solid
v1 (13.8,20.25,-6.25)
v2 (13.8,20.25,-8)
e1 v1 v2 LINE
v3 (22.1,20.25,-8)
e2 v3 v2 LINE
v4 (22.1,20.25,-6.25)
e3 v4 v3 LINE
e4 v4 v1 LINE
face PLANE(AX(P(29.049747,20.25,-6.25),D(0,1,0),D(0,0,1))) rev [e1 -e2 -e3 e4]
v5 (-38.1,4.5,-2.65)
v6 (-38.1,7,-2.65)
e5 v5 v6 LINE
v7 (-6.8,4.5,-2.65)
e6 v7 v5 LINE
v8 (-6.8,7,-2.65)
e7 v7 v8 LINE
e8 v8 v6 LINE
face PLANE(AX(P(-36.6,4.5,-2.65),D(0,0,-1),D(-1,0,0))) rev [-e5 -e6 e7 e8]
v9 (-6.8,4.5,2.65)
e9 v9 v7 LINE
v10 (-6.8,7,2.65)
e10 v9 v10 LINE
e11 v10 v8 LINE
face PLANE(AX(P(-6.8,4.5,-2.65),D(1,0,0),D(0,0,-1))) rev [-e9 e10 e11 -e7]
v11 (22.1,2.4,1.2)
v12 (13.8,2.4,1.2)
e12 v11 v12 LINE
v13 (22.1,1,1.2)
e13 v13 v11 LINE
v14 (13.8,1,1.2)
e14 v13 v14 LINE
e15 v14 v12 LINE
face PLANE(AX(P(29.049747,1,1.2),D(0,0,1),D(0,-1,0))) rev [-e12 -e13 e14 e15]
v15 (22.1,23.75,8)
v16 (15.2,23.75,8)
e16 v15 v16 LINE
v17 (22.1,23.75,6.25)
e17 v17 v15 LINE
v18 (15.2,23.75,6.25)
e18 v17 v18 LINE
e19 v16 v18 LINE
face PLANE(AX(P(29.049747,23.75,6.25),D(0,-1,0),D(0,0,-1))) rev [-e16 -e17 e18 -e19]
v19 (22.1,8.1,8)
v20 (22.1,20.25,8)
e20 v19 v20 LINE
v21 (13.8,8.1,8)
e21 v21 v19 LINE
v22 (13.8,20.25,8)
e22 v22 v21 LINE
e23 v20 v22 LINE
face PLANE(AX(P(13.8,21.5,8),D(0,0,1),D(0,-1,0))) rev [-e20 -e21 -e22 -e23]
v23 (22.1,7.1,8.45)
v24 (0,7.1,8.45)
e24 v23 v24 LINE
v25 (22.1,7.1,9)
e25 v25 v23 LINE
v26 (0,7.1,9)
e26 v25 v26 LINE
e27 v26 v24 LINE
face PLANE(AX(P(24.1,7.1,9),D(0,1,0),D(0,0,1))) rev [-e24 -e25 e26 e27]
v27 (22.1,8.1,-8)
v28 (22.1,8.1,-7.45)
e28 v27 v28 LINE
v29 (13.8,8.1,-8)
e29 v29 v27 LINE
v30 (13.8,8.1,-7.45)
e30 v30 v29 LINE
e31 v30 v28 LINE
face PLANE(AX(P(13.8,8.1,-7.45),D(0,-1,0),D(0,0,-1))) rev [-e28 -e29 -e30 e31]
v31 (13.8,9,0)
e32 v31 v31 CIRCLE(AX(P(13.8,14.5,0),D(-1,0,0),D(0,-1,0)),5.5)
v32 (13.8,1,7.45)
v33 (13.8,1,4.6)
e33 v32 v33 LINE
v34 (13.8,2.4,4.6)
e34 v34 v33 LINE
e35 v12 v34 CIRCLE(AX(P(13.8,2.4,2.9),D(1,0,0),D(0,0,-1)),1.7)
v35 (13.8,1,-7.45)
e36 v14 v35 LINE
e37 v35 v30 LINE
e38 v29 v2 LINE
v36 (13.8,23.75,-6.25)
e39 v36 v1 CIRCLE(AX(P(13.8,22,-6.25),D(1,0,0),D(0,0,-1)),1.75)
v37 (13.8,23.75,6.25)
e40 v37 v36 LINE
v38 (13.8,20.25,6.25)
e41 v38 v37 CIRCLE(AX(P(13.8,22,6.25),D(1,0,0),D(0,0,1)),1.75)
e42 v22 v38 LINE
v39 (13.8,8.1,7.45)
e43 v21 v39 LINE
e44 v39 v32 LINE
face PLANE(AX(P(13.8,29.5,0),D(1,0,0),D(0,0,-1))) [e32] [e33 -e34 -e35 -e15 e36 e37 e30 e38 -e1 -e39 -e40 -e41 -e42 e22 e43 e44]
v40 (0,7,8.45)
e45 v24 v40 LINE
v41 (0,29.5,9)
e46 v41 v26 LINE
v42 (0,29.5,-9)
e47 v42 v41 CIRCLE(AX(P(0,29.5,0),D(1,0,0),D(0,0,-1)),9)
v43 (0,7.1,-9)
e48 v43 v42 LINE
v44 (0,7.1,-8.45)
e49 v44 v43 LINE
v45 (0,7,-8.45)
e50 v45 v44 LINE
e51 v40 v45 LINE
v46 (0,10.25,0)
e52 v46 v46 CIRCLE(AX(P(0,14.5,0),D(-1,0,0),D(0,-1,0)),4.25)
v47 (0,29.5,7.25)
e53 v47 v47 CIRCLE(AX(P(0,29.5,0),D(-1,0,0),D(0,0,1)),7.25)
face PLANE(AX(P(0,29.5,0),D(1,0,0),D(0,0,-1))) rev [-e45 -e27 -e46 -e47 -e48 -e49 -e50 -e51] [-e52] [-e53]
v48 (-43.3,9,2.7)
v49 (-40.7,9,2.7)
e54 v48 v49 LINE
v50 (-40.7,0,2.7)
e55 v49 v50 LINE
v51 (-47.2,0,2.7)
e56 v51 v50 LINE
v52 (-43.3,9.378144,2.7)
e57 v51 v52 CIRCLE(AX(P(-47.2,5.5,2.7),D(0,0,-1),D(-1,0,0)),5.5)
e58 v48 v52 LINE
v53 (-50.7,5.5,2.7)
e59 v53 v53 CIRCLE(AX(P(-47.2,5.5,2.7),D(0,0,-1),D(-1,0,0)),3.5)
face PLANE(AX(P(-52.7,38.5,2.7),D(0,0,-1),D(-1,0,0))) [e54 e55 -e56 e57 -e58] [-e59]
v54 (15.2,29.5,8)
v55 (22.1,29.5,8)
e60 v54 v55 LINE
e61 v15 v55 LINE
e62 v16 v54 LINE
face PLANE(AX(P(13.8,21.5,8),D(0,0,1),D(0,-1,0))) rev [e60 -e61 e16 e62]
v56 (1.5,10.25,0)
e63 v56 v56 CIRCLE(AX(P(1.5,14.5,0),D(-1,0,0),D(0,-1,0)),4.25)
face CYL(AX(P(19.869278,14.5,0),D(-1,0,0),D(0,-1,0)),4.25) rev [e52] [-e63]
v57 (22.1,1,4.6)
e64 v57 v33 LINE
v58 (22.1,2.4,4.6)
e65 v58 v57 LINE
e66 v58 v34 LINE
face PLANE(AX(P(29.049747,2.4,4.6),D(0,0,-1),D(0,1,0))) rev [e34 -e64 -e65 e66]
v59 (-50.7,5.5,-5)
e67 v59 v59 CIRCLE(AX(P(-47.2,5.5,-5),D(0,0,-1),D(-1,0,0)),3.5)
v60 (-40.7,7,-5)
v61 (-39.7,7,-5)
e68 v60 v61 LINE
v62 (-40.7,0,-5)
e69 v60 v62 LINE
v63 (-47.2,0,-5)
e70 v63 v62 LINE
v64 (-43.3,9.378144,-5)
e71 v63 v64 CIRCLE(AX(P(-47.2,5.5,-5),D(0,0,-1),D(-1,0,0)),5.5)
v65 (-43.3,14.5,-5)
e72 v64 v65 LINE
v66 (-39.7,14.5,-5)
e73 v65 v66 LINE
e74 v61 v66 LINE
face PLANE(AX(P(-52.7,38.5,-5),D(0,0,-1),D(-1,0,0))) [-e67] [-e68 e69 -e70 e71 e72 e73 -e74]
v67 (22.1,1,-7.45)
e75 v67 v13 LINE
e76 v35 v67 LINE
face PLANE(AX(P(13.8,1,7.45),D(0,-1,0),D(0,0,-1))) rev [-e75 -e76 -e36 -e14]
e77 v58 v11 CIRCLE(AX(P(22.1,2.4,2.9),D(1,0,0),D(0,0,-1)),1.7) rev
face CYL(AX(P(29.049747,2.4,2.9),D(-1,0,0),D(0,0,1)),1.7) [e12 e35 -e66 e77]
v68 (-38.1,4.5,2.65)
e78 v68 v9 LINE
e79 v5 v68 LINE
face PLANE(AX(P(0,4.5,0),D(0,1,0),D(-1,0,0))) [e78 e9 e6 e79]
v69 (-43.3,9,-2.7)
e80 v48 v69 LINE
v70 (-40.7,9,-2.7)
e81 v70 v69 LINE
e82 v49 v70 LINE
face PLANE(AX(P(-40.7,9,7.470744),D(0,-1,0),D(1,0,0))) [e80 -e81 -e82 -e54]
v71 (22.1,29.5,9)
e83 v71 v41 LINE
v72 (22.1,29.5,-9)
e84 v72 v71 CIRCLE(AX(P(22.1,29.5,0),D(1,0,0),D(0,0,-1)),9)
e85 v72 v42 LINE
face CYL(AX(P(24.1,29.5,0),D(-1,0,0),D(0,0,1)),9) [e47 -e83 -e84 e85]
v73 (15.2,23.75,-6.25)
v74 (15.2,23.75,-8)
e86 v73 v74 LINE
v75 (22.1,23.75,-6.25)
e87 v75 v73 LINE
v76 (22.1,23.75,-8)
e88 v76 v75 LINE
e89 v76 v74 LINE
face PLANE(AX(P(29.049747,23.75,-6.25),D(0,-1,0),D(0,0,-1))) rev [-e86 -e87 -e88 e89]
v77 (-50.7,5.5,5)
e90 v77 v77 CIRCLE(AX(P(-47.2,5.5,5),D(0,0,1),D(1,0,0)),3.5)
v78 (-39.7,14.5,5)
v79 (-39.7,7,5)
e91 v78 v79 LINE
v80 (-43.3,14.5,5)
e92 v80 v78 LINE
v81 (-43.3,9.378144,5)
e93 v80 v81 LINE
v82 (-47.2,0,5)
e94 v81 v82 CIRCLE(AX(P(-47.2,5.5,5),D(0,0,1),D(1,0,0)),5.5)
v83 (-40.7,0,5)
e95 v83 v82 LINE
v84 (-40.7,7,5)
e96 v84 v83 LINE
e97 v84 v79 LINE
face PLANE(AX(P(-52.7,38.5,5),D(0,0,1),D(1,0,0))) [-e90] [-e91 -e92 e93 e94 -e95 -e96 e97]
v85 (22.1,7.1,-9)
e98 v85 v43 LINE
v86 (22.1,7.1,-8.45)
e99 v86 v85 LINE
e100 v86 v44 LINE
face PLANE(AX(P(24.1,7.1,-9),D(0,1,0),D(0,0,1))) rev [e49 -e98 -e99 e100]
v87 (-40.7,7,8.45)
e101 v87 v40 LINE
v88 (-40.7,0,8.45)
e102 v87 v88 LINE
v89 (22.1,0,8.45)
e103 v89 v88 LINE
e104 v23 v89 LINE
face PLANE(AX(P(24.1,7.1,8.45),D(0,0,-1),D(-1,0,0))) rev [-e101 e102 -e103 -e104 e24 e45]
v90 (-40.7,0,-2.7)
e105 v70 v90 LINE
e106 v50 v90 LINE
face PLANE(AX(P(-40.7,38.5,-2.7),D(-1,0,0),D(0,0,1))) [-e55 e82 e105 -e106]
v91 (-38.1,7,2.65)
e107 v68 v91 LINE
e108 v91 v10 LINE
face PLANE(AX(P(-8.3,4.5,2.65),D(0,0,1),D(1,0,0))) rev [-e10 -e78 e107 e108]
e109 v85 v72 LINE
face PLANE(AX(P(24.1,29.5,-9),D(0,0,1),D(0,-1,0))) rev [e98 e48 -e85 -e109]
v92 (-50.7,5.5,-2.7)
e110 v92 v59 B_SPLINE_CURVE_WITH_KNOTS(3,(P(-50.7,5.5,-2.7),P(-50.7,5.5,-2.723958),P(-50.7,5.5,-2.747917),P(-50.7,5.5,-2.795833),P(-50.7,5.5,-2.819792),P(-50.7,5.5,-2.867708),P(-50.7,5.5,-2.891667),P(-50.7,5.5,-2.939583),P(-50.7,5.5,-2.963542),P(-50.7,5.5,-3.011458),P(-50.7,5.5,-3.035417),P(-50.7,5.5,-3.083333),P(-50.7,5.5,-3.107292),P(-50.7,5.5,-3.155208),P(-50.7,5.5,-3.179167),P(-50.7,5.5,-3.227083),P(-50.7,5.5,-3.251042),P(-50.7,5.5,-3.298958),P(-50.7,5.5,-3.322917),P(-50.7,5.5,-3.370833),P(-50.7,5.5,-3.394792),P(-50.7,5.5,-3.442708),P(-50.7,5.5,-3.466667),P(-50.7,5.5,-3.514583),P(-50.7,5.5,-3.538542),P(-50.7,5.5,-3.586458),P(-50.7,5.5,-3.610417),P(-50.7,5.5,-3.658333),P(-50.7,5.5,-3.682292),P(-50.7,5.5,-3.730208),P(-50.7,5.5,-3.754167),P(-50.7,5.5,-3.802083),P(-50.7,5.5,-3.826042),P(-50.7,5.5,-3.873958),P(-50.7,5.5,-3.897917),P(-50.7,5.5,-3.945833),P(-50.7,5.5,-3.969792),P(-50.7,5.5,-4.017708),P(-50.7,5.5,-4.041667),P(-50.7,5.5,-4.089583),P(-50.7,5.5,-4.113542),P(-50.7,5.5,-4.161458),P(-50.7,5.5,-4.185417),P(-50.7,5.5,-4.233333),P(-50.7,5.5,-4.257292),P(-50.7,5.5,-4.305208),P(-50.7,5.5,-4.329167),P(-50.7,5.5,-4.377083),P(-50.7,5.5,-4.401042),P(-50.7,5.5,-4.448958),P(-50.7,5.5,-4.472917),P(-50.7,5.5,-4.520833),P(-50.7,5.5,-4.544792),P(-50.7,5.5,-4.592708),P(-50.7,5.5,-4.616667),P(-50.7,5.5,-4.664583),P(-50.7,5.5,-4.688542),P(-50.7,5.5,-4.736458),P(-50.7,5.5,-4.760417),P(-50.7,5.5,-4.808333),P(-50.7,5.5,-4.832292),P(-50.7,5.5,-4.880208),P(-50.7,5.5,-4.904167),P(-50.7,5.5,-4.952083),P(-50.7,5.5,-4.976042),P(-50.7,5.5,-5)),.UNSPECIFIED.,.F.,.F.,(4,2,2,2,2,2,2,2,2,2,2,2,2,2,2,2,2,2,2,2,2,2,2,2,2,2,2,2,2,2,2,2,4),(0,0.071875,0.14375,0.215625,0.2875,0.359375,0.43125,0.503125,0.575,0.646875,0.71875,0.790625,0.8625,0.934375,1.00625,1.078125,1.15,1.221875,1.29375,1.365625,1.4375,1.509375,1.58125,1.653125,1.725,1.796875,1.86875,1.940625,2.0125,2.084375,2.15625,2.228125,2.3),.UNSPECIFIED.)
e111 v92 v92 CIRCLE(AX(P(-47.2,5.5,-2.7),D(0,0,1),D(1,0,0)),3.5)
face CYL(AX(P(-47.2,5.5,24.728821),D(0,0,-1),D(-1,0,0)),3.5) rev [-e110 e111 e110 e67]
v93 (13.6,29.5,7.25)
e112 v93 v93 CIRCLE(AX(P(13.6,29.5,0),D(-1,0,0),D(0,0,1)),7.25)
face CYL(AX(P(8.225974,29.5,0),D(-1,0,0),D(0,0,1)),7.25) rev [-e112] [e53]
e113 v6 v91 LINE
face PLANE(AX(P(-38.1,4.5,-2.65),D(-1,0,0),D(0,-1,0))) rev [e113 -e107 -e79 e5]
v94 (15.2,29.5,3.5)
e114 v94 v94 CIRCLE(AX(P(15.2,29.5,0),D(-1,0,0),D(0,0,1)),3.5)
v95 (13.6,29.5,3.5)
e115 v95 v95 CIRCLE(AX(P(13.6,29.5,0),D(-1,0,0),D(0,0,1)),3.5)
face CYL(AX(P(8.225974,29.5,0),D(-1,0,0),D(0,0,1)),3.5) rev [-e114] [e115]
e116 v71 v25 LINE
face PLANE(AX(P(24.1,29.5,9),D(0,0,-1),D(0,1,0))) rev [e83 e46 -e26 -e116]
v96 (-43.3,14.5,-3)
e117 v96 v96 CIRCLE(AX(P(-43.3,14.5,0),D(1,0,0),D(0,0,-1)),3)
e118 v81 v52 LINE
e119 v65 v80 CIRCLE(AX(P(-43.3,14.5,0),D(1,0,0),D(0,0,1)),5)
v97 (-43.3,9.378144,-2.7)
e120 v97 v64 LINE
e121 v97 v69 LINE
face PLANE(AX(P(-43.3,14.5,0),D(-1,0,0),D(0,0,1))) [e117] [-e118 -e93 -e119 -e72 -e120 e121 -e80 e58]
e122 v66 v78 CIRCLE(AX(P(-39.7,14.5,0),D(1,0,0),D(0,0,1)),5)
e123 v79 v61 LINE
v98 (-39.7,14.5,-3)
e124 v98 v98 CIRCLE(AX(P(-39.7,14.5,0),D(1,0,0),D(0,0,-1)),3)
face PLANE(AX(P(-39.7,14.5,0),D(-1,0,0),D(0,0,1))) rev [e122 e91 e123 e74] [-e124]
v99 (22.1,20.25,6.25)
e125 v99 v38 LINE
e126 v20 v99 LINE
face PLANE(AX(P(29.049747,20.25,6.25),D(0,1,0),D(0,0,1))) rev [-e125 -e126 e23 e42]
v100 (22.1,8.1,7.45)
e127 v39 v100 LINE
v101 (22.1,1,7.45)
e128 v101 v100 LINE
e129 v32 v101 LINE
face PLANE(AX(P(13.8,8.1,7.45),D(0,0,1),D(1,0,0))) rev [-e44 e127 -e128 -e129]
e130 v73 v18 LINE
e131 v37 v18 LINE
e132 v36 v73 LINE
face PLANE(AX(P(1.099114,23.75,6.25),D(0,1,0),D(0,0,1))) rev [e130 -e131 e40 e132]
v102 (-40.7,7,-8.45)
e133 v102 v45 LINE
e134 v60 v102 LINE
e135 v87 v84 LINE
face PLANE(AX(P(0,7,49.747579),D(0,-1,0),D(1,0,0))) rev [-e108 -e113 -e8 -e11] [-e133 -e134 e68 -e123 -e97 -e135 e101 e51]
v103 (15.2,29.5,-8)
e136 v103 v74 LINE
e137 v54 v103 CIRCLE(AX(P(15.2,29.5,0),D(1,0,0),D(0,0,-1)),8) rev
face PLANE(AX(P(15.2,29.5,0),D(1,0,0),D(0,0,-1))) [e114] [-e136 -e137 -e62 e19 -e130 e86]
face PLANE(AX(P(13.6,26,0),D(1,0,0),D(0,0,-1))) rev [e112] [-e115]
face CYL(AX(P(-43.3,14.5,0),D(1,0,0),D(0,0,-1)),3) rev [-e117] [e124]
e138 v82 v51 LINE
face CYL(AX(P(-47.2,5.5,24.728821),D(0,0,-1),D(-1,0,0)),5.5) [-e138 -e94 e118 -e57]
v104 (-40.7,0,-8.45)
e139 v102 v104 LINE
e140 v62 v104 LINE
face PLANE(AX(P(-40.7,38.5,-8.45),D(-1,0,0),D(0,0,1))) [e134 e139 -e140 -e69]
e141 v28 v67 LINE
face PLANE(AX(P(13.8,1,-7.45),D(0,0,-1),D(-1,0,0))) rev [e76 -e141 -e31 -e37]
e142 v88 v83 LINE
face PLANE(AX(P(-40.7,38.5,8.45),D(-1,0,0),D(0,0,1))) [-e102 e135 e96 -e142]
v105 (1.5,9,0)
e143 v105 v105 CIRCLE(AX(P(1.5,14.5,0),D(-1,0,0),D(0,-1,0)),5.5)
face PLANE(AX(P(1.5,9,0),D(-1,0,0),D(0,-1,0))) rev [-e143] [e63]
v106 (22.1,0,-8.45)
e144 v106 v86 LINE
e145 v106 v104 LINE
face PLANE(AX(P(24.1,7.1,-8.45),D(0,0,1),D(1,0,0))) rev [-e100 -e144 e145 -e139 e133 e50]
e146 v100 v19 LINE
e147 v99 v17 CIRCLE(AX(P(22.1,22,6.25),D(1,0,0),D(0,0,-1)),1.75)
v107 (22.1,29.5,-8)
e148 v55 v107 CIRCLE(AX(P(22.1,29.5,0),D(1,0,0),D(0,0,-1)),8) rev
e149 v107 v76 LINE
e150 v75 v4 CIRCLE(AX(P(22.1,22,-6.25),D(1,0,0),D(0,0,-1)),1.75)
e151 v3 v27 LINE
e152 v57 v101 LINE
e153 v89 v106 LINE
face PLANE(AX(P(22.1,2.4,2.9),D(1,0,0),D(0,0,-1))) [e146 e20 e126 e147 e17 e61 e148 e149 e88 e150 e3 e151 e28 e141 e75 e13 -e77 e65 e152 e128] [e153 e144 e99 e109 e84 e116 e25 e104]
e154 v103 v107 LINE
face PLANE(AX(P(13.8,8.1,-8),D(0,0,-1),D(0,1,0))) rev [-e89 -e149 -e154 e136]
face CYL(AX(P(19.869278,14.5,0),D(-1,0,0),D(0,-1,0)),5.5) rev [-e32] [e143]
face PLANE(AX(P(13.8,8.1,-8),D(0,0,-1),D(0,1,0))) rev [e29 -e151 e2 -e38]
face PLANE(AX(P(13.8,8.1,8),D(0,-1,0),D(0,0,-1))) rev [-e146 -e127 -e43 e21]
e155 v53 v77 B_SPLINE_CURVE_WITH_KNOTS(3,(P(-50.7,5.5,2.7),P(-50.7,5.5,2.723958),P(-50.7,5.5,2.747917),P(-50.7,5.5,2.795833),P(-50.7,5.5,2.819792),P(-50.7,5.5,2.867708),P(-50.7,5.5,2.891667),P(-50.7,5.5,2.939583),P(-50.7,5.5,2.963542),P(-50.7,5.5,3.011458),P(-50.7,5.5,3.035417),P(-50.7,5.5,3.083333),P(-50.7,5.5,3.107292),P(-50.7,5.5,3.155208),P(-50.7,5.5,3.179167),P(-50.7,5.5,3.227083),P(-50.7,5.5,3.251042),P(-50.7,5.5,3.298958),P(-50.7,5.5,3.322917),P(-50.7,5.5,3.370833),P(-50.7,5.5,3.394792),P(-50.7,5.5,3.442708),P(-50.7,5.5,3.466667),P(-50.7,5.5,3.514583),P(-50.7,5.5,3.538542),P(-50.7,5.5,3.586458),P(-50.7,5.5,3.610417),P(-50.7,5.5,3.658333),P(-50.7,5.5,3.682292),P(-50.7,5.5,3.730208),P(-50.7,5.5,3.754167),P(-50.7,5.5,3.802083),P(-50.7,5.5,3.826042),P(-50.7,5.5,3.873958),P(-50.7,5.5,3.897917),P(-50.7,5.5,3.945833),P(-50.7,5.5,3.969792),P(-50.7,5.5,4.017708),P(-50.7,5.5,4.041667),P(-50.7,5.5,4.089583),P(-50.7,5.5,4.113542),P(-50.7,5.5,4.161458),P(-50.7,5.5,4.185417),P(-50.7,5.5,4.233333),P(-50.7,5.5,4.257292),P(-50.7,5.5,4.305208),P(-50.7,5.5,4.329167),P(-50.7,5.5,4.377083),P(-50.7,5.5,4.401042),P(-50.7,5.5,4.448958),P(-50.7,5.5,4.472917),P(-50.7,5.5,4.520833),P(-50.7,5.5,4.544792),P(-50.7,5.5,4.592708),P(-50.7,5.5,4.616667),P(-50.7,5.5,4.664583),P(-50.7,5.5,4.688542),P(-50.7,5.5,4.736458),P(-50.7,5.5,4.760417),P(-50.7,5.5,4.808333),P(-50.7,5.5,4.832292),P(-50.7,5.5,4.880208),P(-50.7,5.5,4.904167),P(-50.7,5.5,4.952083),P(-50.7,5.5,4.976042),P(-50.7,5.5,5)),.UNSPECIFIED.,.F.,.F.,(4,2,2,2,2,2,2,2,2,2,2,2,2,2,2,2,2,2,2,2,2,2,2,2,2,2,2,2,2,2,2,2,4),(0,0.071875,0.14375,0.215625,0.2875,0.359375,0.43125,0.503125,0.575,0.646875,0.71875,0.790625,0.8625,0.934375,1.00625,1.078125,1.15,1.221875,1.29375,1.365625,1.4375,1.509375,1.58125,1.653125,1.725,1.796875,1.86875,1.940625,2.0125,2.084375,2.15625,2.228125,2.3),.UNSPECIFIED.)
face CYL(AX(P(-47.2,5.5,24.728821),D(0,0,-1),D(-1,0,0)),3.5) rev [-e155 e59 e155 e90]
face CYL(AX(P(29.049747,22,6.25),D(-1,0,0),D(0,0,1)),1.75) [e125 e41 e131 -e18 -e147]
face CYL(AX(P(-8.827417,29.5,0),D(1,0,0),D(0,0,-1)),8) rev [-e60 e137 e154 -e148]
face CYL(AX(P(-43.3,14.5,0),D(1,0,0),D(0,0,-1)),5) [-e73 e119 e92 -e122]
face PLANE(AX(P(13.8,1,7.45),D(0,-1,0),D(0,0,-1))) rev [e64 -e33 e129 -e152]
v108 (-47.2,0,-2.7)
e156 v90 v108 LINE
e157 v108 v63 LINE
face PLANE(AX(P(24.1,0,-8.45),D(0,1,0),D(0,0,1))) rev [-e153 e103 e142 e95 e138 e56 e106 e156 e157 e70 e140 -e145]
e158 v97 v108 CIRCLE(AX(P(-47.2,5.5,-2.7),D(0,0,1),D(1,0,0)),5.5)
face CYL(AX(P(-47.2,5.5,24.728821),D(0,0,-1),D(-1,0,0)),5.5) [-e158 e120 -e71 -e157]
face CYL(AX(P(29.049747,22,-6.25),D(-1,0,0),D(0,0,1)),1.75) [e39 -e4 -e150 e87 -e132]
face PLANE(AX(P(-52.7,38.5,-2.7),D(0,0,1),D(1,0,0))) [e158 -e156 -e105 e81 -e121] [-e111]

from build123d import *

# Parameters (mm, degrees)
BOSS_EXTRUDE18_DEPTH            = 24.1
CUT_EXTRUDE24_DEPTH             = 10.3
CUT_EXTRUDE25_DEPTH             = 8.9
BOSS_EXTRUDE7_DEPTH             = 9.3
CUT_EXTRUDE21_START             = -2
CUT_EXTRUDE21_DEPTH             = 2
BOSS_EXTRUDE2_REACH             = 48.304
SKETCH16_W                      = 40.7
SKETCH16_H                      = 7
BOSS_EXTRUDE2_DIRECTION_2_REACH = 48.304
BOSS_EXTRUDE3_REACH             = 58.743
SKETCH23_R                      = 3.5
BOSS_EXTRUDE3_DIRECTION_2_REACH = 58.743
SKETCH24_W                      = 12
SKETCH24_H                      = 5.4
SKETCH24_H_2                    = 3.45
CUT_EXTRUDE6_DEPTH              = 66.882774684
BOSS_EXTRUDE4_DEPTH             = 1
BOSS_EXTRUDE4_DEPTH_BACK        = 2.6
SKETCH28_R                      = 3
SKETCH33_W                      = 2.6
SKETCH33_H                      = 4
CUT_EXTRUDE10_DEPTH             = 5.4
CUT_EXTRUDE12_DEPTH             = 2.5
DELETEFACE7_START               = 23.1
DELETEFACE7_DEPTH               = 1
CUT_EXTRUDE29_START             = -1
SKETCH105_R                     = 1.7
CUT_EXTRUDE29_DEPTH             = 1
SKETCH106_W                     = 18
SKETCH106_H                     = 31.4
CUT_EXTRUDE30_DEPTH             = 2
CUT_EXTRUDE31_DEPTH             = 1.4


# Read off the part's stored shape, not the designer's step: DeleteFace7
with BuildPart() as part:
    # Sketch95 → Boss-Extrude18 (new body)
    with BuildSketch(Plane(origin=(0, 0, 0), x_dir=(0, 0, -1), z_dir=(1, 0, 0))):
        with BuildLine():
            Line((9, 29.5), (9, 7.1))
            Line((9, 7.1), (8.45, 7.1))
            Line((8.45, 7.1), (8.45, 0))
            Line((8.45, 0), (-8.45, 0))
            Line((-8.45, 0), (-8.45, 7.1))
            Line((-8.45, 7.1), (-9, 7.1))
            Line((-9, 7.1), (-9, 29.5))
            ThreePointArc((-9, 29.5), (0, 38.5), (9, 29.5))
        make_face()
    extrude(amount=BOSS_EXTRUDE18_DEPTH)

    # Sketch96 → Cut-Extrude24 (cut)
    with BuildSketch(Plane(origin=(24.1, 0, 0), x_dir=(0, 0, -1), z_dir=(1, 0, 0))):
        with BuildLine():
            Line((-7.45, 8.1), (-7.45, 1))
            Line((-7.45, 1), (7.45, 1))
            Line((7.45, 1), (7.45, 8.1))
            Line((7.45, 8.1), (8, 8.1))
            Line((8, 8.1), (8, 21.5))
            ThreePointArc((8, 21.5), (6.894427191, 23.288854382), (4.8, 23.1))
            ThreePointArc((4.8, 23.1), (0, 21.5), (-4.8, 23.1))
            ThreePointArc((-4.8, 23.1), (-6.894427191, 23.288854382), (-8, 21.5))
            Line((-8, 21.5), (-8, 8.1))
            Line((-8, 8.1), (-7.45, 8.1))
        make_face()
    extrude(amount=-CUT_EXTRUDE24_DEPTH, mode=Mode.SUBTRACT)

    # Sketch97 → Cut-Extrude25 (cut)
    with BuildSketch(Plane(origin=(24.1, 0, 0), x_dir=(0, 0, -1), z_dir=(1, 0, 0))):
        with BuildLine():
            Line((-8, 29.5), (-8, 21.5))
            Line((-8, 21.5), (8, 21.5))
            Line((8, 21.5), (8, 29.5))
            ThreePointArc((8, 29.5), (0, 37.5), (-8, 29.5))
        make_face()
    extrude(amount=-CUT_EXTRUDE25_DEPTH, mode=Mode.SUBTRACT)

    # Sketch11 → Cut-Revolve1 (revolve, cut)
    with BuildSketch(Plane.XY):
        Polygon((13.8, 14.5), (13.8, 9), (1.5, 9), (1.5, 10.25), (0, 10.25), (0, 14.5), align=None)
    revolve(axis=Axis((19.869277651, 14.5, 0), (-1, 0, 0)), mode=Mode.SUBTRACT)

    # Sketch12 → Cut-Revolve2 (revolve, cut)
    with BuildSketch(Plane.XY, mode=Mode.PRIVATE) as cut_revolve2_sk:
        Polygon((15.2, 29.5), (15.2, 26), (13.6, 26), (13.6, 22.25), (0, 22.25), (0, 29.5), align=None)
    revolve(cut_revolve2_sk.sketch.rotate(Axis((8.225974271, 29.5, 0), (1, 0, 0)), 270), axis=Axis((8.225974271, 29.5, 0), (1, 0, 0)), mode=Mode.SUBTRACT)

    # Sketch69 → Boss-Extrude7 (add)
    with BuildSketch(Plane(origin=(13.8, 0, 0), x_dir=(0, 0, -1), z_dir=(1, 0, 0))):
        with BuildLine():
            Line((8, 23.75), (8, 20.25))
            Line((8, 20.25), (6.25, 20.25))
            ThreePointArc((6.25, 20.25), (4.5, 22), (6.25, 23.75))
            Line((6.25, 23.75), (8, 23.75))
        make_face()
        with BuildLine():
            Line((-8, 23.75), (-8, 20.25))
            Line((-8, 20.25), (-6.25, 20.25))
            ThreePointArc((-6.25, 20.25), (-4.5, 22), (-6.25, 23.75))
            Line((-6.25, 23.75), (-8, 23.75))
        make_face()
        with BuildLine():
            Line((-4.6, 2.4), (-4.6, 1))
            Line((-4.6, 1), (-1.2, 1))
            Line((-1.2, 1), (-1.2, 2.4))
            ThreePointArc((-1.2, 2.4), (-2.9, 4.1), (-4.6, 2.4))
        make_face()
    extrude(amount=BOSS_EXTRUDE7_DEPTH)

    # Sketch80 → Cut-Extrude21 (cut)
    with BuildSketch(Plane(origin=(24.1, 0, 0), x_dir=(0, 0, -1), z_dir=(1, 0, 0)).offset(CUT_EXTRUDE21_START)):
        with BuildLine():
            Line((-7.45, 0), (-9, 0))
            Line((-9, 0), (-9, 8.1))
            Line((-9, 8.1), (-7.45, 8.1))
            Line((-7.45, 8.1), (-7.45, 2.4))
            Line((-7.45, 2.4), (-4.6, 2.4))
            ThreePointArc((-4.6, 2.4), (-2.9, 0.7), (-1.2, 2.4))
            Line((-1.2, 2.4), (7.45, 2.4))
            Line((7.45, 2.4), (7.45, 8.1))
            Line((7.45, 8.1), (9, 8.1))
            Line((9, 8.1), (9, 0))
            Line((9, 0), (7.45, 0))
            Line((7.45, 0), (-7.45, 0))
        make_face()
    extrude(amount=CUT_EXTRUDE21_DEPTH, mode=Mode.SUBTRACT)

    # Boss-Extrude2: up to this face of the body (flat: up to its plane)
    boss_extrude2_end = Plane(part.part.faces().sort_by_distance((11.05, 3.55, 8.45))[0])
    # Sketch16 → Boss-Extrude2 (add, up to the picked face)
    with BuildSketch(Plane.XY, mode=Mode.PRIVATE) as boss_extrude2_sk1:
        with Locations((-20.35, 3.5)):
            Rectangle(SKETCH16_W, SKETCH16_H)
    boss_extrude2_tool1 = split(extrude(boss_extrude2_sk1.sketch, amount=BOSS_EXTRUDE2_REACH, mode=Mode.PRIVATE), bisect_by=boss_extrude2_end, keep=Keep.BOTH, mode=Mode.PRIVATE)
    add(boss_extrude2_tool1.solids().sort_by(Axis((-20.35, 3.5, 0), (0, 0, 1)))[0])

    # Boss-Extrude2 direction 2: up to this face of the body (flat: up to its plane)
    boss_extrude2_direction_2_end = Plane(part.part.faces().sort_by_distance((11.05, 3.55, -8.45))[0])
    # Sketch16 → Boss-Extrude2 direction 2 (add, up to the picked face)
    with BuildSketch(Plane.XY, mode=Mode.PRIVATE) as boss_extrude2_direction_2_sk1:
        with Locations((-20.35, 3.5)):
            Rectangle(SKETCH16_W, SKETCH16_H)
    boss_extrude2_direction_2_tool1 = split(extrude(boss_extrude2_direction_2_sk1.sketch, amount=-BOSS_EXTRUDE2_DIRECTION_2_REACH, mode=Mode.PRIVATE), bisect_by=boss_extrude2_direction_2_end, keep=Keep.BOTH, mode=Mode.PRIVATE)
    add(boss_extrude2_direction_2_tool1.solids().sort_by(Axis((-20.35, 3.5, 0), (0, 0, -1)))[0])

    # Boss-Extrude3: up to this face of the body (flat: up to its plane)
    boss_extrude3_end = Plane(part.part.faces().sort_by_distance((-9.198206243, 3.517757633, 8.45))[0])
    # Sketch23 → Boss-Extrude3 (add, up to the picked face)
    with BuildSketch(Plane.XY, mode=Mode.PRIVATE) as boss_extrude3_sk1:
        with BuildLine():
            Line((-41.908497378, 7), (-40.7, 7))
            Line((-40.7, 7), (-40.7, 0))
            Line((-40.7, 0), (-47.2, 0))
            ThreePointArc((-47.2, 0), (-51.587482194, 8.81662479), (-41.908497378, 7))
        make_face()
        with Locations(Location((-47.2, 5.5, 0), (0, 0, 180))):
            Circle(SKETCH23_R, mode=Mode.SUBTRACT)
    boss_extrude3_tool1 = split(extrude(boss_extrude3_sk1.sketch, amount=BOSS_EXTRUDE3_REACH, mode=Mode.PRIVATE), bisect_by=boss_extrude3_end, keep=Keep.BOTH, mode=Mode.PRIVATE)
    add(boss_extrude3_tool1.solids().sort_by(Axis((-41.304249, 6.837212, 0), (0, 0, 1)))[0])

    # Boss-Extrude3 direction 2: up to this face of the body (flat: up to its plane)
    boss_extrude3_direction_2_end = Plane(part.part.faces().sort_by_distance((-9.198206243, 3.517757633, -8.45))[0])
    # Sketch23 → Boss-Extrude3 direction 2 (add, up to the picked face)
    with BuildSketch(Plane.XY, mode=Mode.PRIVATE) as boss_extrude3_direction_2_sk1:
        with BuildLine():
            Line((-41.908497378, 7), (-40.7, 7))
            Line((-40.7, 7), (-40.7, 0))
            Line((-40.7, 0), (-47.2, 0))
            ThreePointArc((-47.2, 0), (-51.587482194, 8.81662479), (-41.908497378, 7))
        make_face()
        with Locations(Location((-47.2, 5.5, 0), (0, 0, 180))):
            Circle(SKETCH23_R, mode=Mode.SUBTRACT)
    boss_extrude3_direction_2_tool1 = split(extrude(boss_extrude3_direction_2_sk1.sketch, amount=-BOSS_EXTRUDE3_DIRECTION_2_REACH, mode=Mode.PRIVATE), bisect_by=boss_extrude3_direction_2_end, keep=Keep.BOTH, mode=Mode.PRIVATE)
    add(boss_extrude3_direction_2_tool1.solids().sort_by(Axis((-41.304249, 6.837212, 0), (0, 0, -1)))[0])

    # Sketch24 → Cut-Extrude6 (cut, through all)
    with BuildSketch(Plane(origin=(0, 0, 0), x_dir=(1, 0, 0), z_dir=(0, 1, 0))):
        with Locations((-46.7, 0)):
            Rectangle(SKETCH24_W, SKETCH24_H)
        with Locations((-46.7, -6.725)):
            Rectangle(SKETCH24_W, SKETCH24_H_2)
        with Locations((-46.7, 6.725)):
            Rectangle(SKETCH24_W, SKETCH24_H_2)
    extrude(amount=CUT_EXTRUDE6_DEPTH, mode=Mode.SUBTRACT)

    # Sketch28 → Boss-Extrude4 (add, two sides: drawn at the far end of the back side and taken through both)
    with BuildSketch(Plane(origin=(-40.7, 0, 0), x_dir=(0, 0, -1), z_dir=(1, 0, 0)).offset(-BOSS_EXTRUDE4_DEPTH_BACK)):
        with BuildLine():
            Line((-5, 7), (5, 7))
            Line((5, 7), (5, 14.5))
            ThreePointArc((5, 14.5), (0, 19.5), (-5, 14.5))
            Line((-5, 14.5), (-5, 7))
        make_face()
        with Locations((0, 14.5)):
            Circle(SKETCH28_R, mode=Mode.SUBTRACT)
    extrude(amount=BOSS_EXTRUDE4_DEPTH + BOSS_EXTRUDE4_DEPTH_BACK)

    # Sketch33 → Cut-Extrude10 (cut)
    with BuildSketch(Plane.XY.offset(-2.7)):
        with Locations((-42, 7)):
            Rectangle(SKETCH33_W, SKETCH33_H)
    extrude(amount=CUT_EXTRUDE10_DEPTH, mode=Mode.SUBTRACT)

    # Sketch35 → Cut-Extrude12 (cut)
    with BuildSketch(Plane(origin=(0, 7, 0), x_dir=(1, 0, 0), z_dir=(0, 1, 0))):
        Polygon((-36.6, 2.65), (-38.1, 2.65), (-38.1, -2.65), (-36.6, -2.65), (-8.3, -2.65), (-6.8, -2.65), (-6.8, 2.65), (-8.3, 2.65), align=None)
    extrude(amount=-CUT_EXTRUDE12_DEPTH, mode=Mode.SUBTRACT)

    # DeleteFace7 outline → DeleteFace7 (cut)
    with BuildSketch(Plane.YZ.offset(DELETEFACE7_START)):
        with BuildLine():
            Line((1, 1.935634924), (1, 3.864365076))
            ThreePointArc((1, 3.864365076), (0.7, 2.9), (1, 1.935634924))
        make_face()
    extrude(amount=DELETEFACE7_DEPTH, mode=Mode.SUBTRACT)

    # Sketch105 → Cut-Extrude29 (cut)
    with BuildSketch(Plane(origin=(23.1, 0, 0), x_dir=(0, 0, -1), z_dir=(1, 0, 0)).offset(CUT_EXTRUDE29_START)):
        with Locations((-2.9, 2.4)):
            Circle(SKETCH105_R)
    extrude(amount=CUT_EXTRUDE29_DEPTH, mode=Mode.SUBTRACT)

    # Sketch106 → Cut-Extrude30 (cut)
    with BuildSketch(Plane(origin=(24.1, 0, 0), x_dir=(0, 0, -1), z_dir=(1, 0, 0))):
        with Locations((0, 22.8)):
            Rectangle(SKETCH106_W, SKETCH106_H)
    extrude(amount=-CUT_EXTRUDE30_DEPTH, mode=Mode.SUBTRACT)

    # Sketch107 → Cut-Extrude31 (cut)
    with BuildSketch(Plane(origin=(15.2, 0, 0), x_dir=(0, 0, -1), z_dir=(1, 0, 0))):
        with BuildLine():
            Line((-6.25, 23.75), (6.25, 23.75))
            ThreePointArc((6.25, 23.75), (5.583042256, 23.617920693), (5.016760303, 23.241619849))
            ThreePointArc((5.016760303, 23.241619849), (4.906085954, 23.174321373), (4.8, 23.1))
            ThreePointArc((4.8, 23.1), (0, 21.5), (-4.8, 23.1))
            ThreePointArc((-4.8, 23.1), (-4.906085954, 23.174321373), (-5.016760303, 23.241619849))
            ThreePointArc((-5.016760303, 23.241619849), (-5.583042256, 23.617920693), (-6.25, 23.75))
        make_face()
    extrude(amount=-CUT_EXTRUDE31_DEPTH, mode=Mode.SUBTRACT)


solid = part.part
